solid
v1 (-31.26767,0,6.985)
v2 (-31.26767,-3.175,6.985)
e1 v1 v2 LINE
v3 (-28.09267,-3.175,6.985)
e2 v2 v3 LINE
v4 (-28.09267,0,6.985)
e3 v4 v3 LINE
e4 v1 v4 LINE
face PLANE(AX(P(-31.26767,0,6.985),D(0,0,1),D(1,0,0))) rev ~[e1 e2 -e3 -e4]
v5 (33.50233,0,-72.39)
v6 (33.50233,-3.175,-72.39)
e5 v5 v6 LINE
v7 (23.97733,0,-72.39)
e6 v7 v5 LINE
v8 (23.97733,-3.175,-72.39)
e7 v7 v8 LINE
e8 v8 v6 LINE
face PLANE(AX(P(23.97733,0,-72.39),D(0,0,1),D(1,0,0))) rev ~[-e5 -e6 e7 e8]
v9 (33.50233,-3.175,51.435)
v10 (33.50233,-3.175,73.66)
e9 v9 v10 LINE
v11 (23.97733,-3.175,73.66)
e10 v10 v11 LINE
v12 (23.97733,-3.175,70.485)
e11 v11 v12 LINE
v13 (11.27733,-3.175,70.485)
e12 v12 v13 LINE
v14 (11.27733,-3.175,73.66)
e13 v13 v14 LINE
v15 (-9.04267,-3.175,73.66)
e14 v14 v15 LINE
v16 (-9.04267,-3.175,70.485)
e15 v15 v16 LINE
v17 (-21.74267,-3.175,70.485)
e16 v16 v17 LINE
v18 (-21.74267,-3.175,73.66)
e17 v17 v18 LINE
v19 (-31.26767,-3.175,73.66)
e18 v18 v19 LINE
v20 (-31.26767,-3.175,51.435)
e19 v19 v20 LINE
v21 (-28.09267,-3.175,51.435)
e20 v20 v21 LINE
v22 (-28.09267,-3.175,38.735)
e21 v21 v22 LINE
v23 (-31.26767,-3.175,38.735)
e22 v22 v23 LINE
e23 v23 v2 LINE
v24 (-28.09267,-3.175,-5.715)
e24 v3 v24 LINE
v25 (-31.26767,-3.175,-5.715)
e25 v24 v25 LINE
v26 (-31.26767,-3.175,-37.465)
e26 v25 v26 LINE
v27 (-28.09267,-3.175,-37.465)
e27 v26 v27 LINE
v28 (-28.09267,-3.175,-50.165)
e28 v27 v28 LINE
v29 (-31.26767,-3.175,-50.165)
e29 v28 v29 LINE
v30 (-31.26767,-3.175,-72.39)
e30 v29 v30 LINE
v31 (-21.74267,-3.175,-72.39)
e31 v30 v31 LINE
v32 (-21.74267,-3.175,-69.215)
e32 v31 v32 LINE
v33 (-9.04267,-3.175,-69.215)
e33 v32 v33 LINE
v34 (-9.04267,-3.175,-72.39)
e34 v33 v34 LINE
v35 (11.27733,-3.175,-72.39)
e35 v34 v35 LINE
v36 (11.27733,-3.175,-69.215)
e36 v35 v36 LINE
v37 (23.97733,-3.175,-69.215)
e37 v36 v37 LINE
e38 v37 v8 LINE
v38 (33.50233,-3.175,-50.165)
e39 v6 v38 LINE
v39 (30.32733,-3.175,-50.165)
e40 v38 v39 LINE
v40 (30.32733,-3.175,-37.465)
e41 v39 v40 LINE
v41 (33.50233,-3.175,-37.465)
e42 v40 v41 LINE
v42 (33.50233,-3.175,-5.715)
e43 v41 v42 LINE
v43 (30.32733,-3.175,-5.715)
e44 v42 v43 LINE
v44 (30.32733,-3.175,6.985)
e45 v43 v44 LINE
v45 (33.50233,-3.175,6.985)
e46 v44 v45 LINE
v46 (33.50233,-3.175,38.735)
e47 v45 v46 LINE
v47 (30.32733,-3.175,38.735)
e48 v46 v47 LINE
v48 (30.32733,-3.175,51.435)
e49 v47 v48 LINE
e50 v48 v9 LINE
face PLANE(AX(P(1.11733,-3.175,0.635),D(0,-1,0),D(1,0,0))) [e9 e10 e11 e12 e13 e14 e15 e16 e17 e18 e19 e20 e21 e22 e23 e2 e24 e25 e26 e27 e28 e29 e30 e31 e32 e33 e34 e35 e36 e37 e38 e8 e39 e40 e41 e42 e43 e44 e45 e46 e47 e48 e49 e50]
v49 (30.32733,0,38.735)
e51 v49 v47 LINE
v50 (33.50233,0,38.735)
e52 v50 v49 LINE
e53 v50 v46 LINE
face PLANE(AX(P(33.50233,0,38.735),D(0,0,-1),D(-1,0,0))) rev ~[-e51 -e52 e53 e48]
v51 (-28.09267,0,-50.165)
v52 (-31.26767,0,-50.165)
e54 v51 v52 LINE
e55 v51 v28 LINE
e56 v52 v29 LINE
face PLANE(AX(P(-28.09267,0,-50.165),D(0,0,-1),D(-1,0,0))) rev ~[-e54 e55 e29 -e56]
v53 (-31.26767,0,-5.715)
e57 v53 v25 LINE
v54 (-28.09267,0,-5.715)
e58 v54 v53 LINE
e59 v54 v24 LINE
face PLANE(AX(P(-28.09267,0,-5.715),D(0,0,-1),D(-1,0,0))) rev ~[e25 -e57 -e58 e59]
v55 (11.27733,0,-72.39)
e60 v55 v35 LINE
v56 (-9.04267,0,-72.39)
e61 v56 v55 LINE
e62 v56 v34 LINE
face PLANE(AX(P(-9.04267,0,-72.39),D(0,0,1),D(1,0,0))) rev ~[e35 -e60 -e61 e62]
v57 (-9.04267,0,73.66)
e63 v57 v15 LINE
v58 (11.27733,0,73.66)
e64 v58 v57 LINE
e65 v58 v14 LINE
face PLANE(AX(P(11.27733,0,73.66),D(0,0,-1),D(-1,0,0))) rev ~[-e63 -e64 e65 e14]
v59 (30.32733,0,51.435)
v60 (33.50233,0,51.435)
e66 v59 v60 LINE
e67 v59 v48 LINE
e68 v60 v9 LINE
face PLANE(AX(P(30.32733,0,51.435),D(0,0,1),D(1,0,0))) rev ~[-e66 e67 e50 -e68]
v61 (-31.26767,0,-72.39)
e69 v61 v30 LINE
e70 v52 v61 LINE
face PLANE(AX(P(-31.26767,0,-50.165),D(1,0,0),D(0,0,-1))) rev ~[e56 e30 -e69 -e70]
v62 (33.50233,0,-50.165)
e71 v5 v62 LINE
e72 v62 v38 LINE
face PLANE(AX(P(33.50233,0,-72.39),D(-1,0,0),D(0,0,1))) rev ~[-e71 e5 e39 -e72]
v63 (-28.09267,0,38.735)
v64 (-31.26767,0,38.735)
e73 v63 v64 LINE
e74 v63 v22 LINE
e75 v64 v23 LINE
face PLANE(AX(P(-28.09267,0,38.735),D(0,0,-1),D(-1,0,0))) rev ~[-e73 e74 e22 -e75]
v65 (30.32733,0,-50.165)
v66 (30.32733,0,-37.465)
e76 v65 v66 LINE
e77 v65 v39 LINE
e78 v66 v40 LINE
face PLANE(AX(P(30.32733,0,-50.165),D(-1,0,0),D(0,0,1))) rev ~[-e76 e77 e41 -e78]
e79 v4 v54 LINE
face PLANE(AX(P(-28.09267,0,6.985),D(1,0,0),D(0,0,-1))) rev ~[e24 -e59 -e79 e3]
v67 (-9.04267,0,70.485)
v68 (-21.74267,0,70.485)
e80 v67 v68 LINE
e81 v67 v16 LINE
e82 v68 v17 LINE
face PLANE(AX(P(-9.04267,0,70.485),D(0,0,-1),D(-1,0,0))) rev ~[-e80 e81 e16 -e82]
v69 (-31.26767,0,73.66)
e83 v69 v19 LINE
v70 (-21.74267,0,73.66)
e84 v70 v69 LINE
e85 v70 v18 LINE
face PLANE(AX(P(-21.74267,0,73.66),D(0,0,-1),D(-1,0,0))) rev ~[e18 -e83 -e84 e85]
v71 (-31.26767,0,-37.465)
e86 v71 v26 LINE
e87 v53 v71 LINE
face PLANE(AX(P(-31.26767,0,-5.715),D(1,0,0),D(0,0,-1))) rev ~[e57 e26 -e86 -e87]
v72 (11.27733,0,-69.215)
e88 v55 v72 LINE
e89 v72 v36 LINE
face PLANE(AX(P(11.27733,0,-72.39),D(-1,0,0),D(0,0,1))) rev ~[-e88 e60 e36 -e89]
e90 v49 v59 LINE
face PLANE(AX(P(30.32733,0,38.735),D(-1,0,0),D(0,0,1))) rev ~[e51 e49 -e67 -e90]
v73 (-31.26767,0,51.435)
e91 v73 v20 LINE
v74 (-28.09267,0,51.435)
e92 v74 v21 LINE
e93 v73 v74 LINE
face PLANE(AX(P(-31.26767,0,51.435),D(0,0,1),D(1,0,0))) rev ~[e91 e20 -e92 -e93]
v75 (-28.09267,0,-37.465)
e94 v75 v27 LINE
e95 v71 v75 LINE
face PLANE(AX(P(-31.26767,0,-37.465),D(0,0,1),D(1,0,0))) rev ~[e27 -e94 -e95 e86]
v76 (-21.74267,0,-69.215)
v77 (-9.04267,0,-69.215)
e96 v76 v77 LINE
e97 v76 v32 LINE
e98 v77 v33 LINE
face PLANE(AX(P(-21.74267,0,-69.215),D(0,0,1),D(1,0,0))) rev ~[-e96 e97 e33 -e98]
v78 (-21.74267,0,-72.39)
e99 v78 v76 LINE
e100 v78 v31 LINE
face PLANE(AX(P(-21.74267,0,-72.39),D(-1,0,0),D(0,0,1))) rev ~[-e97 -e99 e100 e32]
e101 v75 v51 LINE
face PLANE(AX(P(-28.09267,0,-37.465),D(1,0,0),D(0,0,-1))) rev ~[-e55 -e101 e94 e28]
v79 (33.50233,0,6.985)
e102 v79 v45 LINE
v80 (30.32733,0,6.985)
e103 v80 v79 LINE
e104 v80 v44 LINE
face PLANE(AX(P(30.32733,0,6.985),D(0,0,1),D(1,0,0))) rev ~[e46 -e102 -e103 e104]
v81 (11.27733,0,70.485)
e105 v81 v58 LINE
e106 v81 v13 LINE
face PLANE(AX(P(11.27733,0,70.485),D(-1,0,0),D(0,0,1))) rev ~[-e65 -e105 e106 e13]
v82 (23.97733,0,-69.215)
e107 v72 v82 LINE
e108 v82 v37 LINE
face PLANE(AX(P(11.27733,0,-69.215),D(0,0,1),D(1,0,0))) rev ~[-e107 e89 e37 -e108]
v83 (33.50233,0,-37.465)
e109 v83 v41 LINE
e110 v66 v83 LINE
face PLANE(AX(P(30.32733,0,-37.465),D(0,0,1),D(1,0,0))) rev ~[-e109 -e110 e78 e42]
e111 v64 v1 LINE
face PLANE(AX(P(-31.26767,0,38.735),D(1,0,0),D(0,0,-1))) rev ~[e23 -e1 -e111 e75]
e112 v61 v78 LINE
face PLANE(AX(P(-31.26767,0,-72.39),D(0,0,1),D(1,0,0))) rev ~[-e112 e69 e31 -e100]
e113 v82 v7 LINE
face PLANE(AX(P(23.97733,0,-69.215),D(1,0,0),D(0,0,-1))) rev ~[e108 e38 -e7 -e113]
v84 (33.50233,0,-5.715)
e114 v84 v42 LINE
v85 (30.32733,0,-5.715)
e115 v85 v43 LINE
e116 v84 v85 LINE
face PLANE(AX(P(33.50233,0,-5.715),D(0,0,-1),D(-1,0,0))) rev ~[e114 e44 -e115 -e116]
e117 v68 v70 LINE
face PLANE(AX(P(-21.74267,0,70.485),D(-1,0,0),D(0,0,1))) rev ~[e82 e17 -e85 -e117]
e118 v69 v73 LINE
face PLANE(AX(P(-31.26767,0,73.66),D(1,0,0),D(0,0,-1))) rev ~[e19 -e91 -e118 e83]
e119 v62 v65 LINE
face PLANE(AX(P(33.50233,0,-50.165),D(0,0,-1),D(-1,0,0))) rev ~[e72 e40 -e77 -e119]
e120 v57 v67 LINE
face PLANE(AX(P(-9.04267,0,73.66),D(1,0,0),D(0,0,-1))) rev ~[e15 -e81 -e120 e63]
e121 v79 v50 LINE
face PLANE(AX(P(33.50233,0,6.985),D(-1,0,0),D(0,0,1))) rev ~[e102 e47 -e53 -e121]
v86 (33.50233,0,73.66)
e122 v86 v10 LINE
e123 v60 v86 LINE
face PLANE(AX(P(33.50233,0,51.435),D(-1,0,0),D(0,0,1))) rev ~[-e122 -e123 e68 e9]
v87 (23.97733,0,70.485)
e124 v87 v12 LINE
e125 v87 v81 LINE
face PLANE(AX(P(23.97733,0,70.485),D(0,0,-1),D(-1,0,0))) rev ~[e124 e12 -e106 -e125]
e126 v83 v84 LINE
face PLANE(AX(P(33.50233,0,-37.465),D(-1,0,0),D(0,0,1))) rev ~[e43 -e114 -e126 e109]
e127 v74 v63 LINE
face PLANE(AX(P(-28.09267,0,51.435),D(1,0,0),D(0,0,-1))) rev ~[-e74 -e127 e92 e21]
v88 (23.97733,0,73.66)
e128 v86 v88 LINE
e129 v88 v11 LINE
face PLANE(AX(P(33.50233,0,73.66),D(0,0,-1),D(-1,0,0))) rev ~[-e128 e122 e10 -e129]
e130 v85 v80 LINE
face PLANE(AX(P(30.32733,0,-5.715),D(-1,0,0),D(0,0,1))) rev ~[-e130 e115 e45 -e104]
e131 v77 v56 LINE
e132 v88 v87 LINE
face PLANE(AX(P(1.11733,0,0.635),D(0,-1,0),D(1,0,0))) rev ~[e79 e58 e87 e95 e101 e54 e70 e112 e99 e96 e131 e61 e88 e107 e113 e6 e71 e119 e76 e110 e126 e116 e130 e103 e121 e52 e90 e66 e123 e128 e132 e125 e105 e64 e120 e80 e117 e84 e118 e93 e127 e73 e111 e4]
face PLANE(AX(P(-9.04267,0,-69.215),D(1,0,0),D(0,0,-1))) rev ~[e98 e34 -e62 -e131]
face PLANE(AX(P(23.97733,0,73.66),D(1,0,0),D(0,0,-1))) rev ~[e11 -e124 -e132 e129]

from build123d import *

# Parameters (mm, degrees)
F1_DEPTH = 3.175


# Not quite as in the source:
# - a feature names something its author has since deleted; it is built from what else it names


with BuildPart() as f1:
    # F0 (on Front) → F1 (new body)
    with BuildSketch(Plane.XZ):
        Polygon((-31.2676696369, 73.66), (-31.2676696369, 51.435), (-28.0926696369, 51.435), (-28.0926696369, 38.735), (-31.2676696369, 38.735), (-31.2676696369, 6.985), (-28.0926696369, 6.985), (-28.0926696369, -5.715), (-31.2676696369, -5.715), (-31.2676696369, -37.465), (-28.0926696369, -37.465), (-28.0926696369, -50.165), (-31.2676696369, -50.165), (-31.2676696369, -72.39), (-21.7426696369, -72.39), (-21.7426696369, -69.215), (-9.0426696369, -69.215), (-9.0426696369, -72.39), (11.2773303631, -72.39), (11.2773303631, -69.215), (23.9773303631, -69.215), (23.9773303631, -72.39), (33.5023303631, -72.39), (33.5023303631, -50.165), (30.3273303631, -50.165), (30.3273303631, -37.465), (33.5023303631, -37.465), (33.5023303631, -5.715), (30.3273303631, -5.715), (30.3273303631, 6.985), (33.5023303631, 6.985), (33.5023303631, 38.735), (30.3273303631, 38.735), (30.3273303631, 51.435), (33.5023303631, 51.435), (33.5023303631, 73.66), (23.9773303631, 73.66), (23.9773303631, 70.485), (11.2773303631, 70.485), (11.2773303631, 73.66), (-9.0426696369, 73.66), (-9.0426696369, 70.485), (-21.7426696369, 70.485), (-21.7426696369, 73.66), align=None)
    extrude(amount=F1_DEPTH)


solid = f1.part
